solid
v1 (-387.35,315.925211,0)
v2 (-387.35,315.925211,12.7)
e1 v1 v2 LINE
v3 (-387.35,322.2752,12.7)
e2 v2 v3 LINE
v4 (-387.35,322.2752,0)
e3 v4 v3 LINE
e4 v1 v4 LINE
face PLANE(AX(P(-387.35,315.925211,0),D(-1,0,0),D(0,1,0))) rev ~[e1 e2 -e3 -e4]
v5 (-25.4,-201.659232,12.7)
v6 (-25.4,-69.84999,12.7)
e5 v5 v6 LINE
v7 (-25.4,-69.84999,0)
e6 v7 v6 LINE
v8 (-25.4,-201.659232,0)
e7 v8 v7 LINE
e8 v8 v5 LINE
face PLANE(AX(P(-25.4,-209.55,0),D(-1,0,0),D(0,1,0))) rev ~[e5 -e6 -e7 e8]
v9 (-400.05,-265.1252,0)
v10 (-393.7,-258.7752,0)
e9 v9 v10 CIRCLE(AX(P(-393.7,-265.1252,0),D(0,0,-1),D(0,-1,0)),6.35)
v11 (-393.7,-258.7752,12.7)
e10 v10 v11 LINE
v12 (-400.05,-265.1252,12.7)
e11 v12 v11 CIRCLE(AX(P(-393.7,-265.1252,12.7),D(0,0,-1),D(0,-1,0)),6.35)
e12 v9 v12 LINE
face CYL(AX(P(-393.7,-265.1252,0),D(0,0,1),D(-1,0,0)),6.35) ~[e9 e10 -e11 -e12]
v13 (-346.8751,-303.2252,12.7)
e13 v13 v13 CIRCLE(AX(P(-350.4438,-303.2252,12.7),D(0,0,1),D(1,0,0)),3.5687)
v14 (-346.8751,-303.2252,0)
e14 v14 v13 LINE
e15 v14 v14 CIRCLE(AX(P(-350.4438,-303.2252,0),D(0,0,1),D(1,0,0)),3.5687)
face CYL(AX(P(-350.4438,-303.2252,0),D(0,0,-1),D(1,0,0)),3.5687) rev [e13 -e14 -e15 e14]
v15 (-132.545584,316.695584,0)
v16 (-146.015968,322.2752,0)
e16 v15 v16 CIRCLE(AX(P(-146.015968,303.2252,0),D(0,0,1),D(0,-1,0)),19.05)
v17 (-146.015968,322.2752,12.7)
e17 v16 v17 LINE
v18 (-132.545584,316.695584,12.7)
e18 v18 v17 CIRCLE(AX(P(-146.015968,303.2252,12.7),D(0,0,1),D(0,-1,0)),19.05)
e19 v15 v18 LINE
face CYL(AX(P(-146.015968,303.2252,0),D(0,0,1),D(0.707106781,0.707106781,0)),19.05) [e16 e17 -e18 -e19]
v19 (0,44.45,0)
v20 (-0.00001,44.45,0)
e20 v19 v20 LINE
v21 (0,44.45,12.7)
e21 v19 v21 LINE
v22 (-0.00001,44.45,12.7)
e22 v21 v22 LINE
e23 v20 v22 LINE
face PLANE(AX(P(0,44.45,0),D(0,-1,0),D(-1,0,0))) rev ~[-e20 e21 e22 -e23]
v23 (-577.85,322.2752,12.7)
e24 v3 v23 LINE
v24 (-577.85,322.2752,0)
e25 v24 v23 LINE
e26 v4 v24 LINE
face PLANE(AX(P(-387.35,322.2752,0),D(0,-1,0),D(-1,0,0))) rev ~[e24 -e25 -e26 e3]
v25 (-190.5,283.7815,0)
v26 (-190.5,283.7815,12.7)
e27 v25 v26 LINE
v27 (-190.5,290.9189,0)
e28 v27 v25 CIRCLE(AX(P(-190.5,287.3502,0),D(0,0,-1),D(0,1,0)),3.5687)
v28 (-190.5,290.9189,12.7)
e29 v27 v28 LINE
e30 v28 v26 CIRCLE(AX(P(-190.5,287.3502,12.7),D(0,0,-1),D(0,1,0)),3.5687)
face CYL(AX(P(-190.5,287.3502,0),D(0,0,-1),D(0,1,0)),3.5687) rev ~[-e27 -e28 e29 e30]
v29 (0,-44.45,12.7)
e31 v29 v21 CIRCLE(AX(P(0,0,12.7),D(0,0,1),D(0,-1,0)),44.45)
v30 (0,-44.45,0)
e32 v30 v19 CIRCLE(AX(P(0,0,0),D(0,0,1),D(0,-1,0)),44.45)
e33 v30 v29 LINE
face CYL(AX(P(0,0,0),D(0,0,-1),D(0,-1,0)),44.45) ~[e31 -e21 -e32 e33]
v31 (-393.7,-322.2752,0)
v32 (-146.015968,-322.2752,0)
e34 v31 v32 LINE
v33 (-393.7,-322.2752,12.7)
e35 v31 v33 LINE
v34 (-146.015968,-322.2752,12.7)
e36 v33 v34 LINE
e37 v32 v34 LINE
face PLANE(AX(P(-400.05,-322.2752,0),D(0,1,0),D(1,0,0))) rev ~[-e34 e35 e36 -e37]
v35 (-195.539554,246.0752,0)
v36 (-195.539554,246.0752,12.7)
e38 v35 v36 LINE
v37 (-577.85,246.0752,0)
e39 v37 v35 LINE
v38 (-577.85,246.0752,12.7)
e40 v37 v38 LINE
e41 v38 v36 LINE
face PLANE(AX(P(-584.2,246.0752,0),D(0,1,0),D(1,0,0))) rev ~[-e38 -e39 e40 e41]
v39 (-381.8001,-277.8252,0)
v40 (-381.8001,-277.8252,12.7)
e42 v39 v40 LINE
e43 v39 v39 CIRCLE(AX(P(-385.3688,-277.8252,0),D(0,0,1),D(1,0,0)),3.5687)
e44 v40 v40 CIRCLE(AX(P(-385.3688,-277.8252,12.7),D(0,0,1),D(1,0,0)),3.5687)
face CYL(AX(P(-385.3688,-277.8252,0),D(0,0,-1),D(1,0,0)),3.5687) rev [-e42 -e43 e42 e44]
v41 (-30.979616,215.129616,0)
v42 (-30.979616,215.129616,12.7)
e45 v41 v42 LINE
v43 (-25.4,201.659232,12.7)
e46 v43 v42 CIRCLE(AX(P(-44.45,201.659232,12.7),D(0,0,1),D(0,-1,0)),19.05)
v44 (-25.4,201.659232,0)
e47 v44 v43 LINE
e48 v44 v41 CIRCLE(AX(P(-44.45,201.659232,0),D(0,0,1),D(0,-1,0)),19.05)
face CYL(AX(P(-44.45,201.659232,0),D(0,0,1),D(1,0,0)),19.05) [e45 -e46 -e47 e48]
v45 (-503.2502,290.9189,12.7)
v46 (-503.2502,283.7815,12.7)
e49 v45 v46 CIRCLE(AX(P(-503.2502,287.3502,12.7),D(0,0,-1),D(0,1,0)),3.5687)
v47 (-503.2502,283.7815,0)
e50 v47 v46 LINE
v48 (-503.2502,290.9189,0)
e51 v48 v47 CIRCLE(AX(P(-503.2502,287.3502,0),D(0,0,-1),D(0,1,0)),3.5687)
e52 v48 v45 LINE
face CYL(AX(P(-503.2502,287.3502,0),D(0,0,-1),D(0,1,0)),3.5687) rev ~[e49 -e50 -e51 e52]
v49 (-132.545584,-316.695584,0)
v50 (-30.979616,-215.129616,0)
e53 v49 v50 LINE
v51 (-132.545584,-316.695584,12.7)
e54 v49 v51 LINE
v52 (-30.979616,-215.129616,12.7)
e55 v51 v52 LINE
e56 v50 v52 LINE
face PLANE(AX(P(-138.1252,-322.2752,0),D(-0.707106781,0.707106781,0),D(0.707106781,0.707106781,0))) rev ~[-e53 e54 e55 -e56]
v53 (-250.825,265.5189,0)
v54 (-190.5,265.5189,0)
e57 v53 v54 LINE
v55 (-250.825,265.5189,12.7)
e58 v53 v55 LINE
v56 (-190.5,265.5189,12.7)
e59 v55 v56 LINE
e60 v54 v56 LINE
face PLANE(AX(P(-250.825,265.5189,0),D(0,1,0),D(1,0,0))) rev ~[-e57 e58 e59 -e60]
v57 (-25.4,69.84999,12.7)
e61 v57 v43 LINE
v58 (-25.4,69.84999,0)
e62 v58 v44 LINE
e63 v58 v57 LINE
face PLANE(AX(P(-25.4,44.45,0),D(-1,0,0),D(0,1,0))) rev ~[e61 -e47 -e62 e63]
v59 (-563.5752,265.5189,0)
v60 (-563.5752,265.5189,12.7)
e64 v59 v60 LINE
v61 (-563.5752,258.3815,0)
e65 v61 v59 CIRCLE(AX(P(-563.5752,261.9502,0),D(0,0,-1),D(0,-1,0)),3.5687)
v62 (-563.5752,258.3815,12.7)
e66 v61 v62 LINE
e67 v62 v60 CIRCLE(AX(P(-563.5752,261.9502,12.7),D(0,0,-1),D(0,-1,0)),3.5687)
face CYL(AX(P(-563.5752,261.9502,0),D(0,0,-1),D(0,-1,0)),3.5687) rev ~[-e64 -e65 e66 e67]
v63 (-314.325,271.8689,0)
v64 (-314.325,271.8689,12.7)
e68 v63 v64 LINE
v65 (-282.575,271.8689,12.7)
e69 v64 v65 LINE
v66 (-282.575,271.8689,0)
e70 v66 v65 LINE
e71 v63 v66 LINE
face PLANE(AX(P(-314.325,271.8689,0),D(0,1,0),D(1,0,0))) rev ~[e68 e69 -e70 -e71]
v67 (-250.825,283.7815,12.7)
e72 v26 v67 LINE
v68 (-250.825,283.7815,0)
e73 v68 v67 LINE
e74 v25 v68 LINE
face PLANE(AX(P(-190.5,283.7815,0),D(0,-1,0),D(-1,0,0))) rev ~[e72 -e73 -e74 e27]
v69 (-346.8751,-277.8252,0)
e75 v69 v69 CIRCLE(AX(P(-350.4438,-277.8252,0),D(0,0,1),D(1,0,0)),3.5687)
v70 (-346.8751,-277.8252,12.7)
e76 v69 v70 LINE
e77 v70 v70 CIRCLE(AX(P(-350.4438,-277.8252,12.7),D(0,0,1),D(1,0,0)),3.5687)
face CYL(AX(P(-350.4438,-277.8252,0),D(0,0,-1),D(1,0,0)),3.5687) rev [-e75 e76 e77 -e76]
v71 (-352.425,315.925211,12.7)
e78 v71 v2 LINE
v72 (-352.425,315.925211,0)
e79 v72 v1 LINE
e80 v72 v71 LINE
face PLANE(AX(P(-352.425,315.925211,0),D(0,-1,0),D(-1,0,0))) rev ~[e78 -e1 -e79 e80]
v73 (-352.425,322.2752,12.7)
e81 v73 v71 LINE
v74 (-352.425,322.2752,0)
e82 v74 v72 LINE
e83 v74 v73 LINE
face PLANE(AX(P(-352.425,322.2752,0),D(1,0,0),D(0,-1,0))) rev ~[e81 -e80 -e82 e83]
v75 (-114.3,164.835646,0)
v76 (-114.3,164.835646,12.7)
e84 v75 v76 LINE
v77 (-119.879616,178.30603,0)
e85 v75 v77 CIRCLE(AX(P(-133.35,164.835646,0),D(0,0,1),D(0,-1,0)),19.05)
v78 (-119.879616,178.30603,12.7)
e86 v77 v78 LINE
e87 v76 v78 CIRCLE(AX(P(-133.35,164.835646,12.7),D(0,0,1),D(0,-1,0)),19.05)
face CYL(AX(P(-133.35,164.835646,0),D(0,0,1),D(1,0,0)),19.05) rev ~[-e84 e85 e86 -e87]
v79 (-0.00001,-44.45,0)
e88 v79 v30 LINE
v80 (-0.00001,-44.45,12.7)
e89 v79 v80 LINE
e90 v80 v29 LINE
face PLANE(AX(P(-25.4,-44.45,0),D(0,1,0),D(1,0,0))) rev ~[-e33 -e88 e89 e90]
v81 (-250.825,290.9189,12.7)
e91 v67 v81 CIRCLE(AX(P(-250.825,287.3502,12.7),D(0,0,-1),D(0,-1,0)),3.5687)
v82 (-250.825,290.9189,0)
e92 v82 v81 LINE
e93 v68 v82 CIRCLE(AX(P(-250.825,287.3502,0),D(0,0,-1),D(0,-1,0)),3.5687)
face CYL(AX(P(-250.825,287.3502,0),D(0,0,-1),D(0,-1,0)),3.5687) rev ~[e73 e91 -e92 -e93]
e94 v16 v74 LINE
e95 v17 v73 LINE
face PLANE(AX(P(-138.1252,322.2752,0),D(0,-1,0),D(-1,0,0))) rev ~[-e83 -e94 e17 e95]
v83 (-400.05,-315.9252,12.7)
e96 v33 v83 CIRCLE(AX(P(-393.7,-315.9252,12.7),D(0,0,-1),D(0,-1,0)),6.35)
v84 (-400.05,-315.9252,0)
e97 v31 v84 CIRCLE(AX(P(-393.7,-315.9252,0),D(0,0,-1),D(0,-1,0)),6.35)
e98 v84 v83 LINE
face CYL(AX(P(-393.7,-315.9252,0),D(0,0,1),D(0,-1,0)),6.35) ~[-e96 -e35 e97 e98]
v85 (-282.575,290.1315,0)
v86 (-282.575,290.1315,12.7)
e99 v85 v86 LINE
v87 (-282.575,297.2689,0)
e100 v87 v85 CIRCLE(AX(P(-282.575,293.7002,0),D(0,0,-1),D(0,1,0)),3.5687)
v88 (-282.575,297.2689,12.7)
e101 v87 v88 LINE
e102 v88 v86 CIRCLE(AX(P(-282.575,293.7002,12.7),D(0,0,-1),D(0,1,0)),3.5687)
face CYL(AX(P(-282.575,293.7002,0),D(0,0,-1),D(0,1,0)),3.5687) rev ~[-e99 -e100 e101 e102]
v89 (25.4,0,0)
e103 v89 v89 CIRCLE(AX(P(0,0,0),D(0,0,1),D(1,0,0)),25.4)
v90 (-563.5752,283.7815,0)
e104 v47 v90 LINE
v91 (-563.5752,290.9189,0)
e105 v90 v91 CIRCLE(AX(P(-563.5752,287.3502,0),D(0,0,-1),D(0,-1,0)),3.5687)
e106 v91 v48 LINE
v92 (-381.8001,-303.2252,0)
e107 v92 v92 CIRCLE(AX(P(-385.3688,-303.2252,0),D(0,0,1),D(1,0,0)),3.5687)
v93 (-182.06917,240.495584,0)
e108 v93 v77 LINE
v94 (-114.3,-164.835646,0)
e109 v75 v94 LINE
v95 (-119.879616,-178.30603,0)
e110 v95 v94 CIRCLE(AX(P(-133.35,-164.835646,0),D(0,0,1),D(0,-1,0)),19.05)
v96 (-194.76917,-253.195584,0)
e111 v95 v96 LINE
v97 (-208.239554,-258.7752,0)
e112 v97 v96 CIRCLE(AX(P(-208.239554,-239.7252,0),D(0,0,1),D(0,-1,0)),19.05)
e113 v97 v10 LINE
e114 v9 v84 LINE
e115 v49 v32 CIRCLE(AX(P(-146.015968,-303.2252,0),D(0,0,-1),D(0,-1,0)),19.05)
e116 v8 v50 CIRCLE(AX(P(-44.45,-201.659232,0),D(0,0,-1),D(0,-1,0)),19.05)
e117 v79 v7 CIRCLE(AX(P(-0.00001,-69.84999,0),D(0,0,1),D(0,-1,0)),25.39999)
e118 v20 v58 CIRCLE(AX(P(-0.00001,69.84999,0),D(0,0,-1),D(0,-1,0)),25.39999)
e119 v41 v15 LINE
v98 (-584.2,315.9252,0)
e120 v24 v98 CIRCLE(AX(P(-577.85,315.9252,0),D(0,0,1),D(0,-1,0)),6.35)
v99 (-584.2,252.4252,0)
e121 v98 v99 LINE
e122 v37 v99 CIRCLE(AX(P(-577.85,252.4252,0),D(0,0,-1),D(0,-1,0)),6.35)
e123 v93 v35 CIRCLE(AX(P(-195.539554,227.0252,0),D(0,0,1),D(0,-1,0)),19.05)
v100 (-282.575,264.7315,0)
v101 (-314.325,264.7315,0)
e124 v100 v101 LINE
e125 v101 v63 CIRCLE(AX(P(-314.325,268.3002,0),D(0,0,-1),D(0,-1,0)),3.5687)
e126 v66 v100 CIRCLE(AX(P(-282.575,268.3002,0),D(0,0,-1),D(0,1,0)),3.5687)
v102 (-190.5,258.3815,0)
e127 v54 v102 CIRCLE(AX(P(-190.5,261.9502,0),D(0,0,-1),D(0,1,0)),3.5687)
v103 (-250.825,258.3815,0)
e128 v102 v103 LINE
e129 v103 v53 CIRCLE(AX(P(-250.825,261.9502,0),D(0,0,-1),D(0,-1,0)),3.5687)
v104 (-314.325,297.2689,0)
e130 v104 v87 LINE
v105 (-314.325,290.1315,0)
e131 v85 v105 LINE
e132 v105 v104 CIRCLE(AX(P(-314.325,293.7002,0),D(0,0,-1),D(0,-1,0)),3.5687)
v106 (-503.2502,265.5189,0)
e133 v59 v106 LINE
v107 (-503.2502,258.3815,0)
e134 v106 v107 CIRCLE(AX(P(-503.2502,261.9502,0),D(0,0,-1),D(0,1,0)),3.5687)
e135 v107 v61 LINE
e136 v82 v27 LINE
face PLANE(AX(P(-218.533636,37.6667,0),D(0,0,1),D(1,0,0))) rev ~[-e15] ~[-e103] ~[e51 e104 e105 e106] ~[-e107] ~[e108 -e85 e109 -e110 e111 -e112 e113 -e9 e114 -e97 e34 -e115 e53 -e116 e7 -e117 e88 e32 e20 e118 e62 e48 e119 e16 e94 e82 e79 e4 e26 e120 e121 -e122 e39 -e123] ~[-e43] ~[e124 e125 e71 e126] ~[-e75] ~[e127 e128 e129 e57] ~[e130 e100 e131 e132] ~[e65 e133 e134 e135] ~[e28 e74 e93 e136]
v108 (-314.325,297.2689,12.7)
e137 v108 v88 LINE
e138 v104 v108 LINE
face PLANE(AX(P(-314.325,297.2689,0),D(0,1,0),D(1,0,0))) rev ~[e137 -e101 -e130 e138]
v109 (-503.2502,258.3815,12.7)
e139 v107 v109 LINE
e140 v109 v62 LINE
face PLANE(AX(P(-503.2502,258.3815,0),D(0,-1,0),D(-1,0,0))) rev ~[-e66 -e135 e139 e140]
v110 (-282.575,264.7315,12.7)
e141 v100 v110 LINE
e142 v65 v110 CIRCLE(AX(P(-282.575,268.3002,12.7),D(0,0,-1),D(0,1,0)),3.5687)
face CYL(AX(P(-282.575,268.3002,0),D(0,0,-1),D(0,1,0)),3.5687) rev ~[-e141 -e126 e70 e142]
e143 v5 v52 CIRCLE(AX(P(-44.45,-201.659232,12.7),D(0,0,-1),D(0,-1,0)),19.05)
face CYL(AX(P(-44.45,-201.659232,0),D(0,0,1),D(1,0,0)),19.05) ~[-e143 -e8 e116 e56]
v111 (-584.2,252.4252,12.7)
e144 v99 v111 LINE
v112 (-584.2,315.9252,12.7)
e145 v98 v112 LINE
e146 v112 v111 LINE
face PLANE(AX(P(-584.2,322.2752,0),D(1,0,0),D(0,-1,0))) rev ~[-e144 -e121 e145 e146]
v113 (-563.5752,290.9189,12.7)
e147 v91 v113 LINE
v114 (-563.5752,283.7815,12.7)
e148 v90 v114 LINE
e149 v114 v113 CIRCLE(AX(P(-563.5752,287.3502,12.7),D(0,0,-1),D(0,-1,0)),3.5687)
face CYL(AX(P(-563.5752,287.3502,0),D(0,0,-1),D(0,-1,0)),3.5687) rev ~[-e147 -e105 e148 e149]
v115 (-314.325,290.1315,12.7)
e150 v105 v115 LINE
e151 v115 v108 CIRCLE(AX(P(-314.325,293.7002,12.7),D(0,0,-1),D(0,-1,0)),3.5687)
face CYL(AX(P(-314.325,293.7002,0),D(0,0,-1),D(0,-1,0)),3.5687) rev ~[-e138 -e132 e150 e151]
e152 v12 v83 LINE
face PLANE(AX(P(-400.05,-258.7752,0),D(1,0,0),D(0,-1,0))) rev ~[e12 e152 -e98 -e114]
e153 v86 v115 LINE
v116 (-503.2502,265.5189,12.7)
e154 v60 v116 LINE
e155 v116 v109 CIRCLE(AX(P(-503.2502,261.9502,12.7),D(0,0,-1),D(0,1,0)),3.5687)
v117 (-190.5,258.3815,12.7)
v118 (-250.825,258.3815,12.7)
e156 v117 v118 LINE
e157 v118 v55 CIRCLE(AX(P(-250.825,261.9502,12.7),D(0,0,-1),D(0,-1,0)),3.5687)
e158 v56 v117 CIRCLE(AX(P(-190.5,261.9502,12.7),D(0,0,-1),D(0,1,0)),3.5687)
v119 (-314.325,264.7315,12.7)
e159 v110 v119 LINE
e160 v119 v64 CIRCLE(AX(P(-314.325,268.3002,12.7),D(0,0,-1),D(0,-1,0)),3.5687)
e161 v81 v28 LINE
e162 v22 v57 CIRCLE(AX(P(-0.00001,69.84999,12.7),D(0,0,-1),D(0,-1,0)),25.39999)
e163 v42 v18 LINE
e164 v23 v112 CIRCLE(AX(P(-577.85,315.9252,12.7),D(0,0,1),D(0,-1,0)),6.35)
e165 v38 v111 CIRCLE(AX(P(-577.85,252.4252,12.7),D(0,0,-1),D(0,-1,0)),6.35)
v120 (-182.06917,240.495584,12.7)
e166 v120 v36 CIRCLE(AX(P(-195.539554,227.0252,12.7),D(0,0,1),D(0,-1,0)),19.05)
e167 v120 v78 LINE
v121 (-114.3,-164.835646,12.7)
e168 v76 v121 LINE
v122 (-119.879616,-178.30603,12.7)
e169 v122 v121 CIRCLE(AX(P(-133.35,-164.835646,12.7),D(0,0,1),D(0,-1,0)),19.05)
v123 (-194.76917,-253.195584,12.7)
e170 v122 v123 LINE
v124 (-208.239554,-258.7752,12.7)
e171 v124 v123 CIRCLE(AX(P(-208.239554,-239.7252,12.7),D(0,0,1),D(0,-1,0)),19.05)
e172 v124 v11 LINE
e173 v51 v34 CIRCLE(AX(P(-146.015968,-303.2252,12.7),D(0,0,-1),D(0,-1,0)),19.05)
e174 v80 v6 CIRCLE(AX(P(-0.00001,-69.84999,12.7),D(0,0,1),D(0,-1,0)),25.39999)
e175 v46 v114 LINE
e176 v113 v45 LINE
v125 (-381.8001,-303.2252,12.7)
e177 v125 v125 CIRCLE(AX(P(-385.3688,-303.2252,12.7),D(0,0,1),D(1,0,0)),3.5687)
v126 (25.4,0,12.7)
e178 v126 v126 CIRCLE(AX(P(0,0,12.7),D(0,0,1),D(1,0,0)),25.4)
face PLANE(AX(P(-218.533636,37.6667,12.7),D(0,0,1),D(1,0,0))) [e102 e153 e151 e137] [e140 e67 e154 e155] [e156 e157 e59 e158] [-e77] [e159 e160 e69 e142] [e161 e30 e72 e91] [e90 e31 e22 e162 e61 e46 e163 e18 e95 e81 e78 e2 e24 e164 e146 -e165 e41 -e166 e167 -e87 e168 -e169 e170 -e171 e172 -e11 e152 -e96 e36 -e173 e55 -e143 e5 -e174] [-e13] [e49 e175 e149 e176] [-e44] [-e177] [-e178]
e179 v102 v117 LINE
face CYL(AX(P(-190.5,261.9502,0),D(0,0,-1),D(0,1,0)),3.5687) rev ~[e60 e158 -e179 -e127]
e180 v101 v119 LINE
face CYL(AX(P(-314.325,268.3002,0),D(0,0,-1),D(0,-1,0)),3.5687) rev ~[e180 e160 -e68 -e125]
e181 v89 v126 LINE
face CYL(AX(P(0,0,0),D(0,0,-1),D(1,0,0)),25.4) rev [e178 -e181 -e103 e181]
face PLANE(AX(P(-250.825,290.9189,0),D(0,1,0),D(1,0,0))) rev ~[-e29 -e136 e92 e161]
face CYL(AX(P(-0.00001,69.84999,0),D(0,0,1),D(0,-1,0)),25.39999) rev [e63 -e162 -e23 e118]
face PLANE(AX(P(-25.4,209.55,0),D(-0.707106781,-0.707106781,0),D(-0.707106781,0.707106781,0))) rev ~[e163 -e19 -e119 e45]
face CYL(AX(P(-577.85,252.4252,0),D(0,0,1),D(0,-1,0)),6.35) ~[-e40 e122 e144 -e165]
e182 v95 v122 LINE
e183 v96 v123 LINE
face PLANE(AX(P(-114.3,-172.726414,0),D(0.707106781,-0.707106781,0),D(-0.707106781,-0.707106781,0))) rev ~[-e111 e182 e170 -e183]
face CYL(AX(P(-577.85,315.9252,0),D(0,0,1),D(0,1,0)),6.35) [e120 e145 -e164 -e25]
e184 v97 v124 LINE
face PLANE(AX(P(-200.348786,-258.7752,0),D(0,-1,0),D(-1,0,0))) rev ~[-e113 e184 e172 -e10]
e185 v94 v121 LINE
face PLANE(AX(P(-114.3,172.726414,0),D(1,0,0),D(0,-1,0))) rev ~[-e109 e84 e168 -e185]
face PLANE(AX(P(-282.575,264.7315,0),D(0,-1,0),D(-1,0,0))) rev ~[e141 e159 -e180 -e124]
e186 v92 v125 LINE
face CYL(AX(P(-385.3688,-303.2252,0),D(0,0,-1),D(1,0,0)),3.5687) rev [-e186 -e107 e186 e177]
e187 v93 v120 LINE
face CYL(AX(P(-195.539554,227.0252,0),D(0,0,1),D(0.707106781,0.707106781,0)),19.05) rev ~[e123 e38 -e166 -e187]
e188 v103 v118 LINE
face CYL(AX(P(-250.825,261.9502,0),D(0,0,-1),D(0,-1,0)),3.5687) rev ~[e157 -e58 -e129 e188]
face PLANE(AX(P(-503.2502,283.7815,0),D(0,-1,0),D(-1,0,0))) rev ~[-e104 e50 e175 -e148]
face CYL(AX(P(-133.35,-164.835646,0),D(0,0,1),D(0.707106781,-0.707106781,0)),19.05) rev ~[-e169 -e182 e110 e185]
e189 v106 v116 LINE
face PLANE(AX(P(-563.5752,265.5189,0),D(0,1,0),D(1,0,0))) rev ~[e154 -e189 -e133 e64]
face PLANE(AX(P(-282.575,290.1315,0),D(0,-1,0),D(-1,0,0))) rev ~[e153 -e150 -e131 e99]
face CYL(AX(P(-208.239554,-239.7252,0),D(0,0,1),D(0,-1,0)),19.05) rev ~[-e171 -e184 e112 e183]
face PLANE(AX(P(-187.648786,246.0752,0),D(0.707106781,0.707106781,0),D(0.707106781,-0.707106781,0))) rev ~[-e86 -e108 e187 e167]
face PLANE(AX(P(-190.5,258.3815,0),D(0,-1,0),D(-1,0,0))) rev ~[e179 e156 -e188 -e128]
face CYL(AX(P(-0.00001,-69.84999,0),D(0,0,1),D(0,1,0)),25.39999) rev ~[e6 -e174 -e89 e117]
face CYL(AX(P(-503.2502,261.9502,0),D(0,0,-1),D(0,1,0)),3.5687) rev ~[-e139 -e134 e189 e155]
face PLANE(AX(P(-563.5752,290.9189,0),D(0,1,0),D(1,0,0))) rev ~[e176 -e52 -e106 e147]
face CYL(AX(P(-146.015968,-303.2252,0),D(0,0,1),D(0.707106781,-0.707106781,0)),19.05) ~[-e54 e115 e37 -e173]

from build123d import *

# Parameters (mm, degrees)
F0_R     = 3.5687
F0_R_2   = 25.4
F1_DEPTH = 12.7
F2_R     = 25.39999
F3_R     = 19.05
F4_R     = 6.35


# Not quite as in the source:
# - a fillet or chamfer is up to 0.001 mm smaller than in the source, because OpenCascade refuses the exact size


with BuildPart() as f1:
    # F0 (on Top) → F1 (new body)
    with BuildSketch(Plane.XY):
        with BuildLine():
            Line((-25.4, -44.45), (0, -44.45))
            ThreePointArc((0, -44.45), (44.45, 0), (0, 44.45))
            Line((0, 44.45), (-25.4, 44.45))
            Line((-25.4, 44.45), (-25.4, 209.55))
            Line((-25.4, 209.55), (-138.1252, 322.2752))
            Line((-138.1252, 322.2752), (-352.425, 322.2752))
            Line((-352.425, 322.2752), (-352.425, 315.9252107143))
            Line((-352.425, 315.9252107143), (-387.35, 315.9252107143))
            Line((-387.35, 315.9252107143), (-387.35, 322.2752))
            Line((-387.35, 322.2752), (-584.2, 322.2752))
            Line((-584.2, 322.2752), (-584.2, 246.0752))
            Line((-584.2, 246.0752), (-187.648785695, 246.0752))
            Line((-187.648785695, 246.0752), (-114.3, 172.726414305))
            Line((-114.3, 172.726414305), (-114.3, -172.726414305))
            Line((-114.3, -172.726414305), (-200.348785695, -258.7752))
            Line((-200.348785695, -258.7752), (-400.05, -258.7752))
            Line((-400.05, -258.7752), (-400.05, -322.2752))
            Line((-400.05, -322.2752), (-138.1252, -322.2752))
            Line((-138.1252, -322.2752), (-25.4, -209.55))
            Line((-25.4, -209.55), (-25.4, -44.45))
        make_face()
        with Locations((-385.3688, -303.2252)):
            Circle(F0_R, mode=Mode.SUBTRACT)
        with Locations((-350.4438, -303.2252)):
            Circle(F0_R, mode=Mode.SUBTRACT)
        with Locations((-385.3688, -277.8252)):
            Circle(F0_R, mode=Mode.SUBTRACT)
        with Locations((-350.4438, -277.8252)):
            Circle(F0_R, mode=Mode.SUBTRACT)
        with BuildLine():
            Line((-503.2502, 258.3815), (-563.5752, 258.3815))
            ThreePointArc((-563.5752, 258.3815), (-567.1439, 261.9502), (-563.5752, 265.5189))
            Line((-563.5752, 265.5189), (-503.2502, 265.5189))
            ThreePointArc((-503.2502, 265.5189), (-499.6815, 261.9502), (-503.2502, 258.3815))
        make_face(mode=Mode.SUBTRACT)
        with BuildLine():
            ThreePointArc((-563.5752, 283.7815), (-567.1439, 287.3502), (-563.5752, 290.9189))
            Line((-563.5752, 290.9189), (-503.2502, 290.9189))
            ThreePointArc((-503.2502, 290.9189), (-499.6815, 287.3502), (-503.2502, 283.7815))
            Line((-503.2502, 283.7815), (-563.5752, 283.7815))
        make_face(mode=Mode.SUBTRACT)
        with BuildLine():
            Line((-282.575, 264.7315), (-314.325, 264.7315))
            ThreePointArc((-314.325, 264.7315), (-317.8937, 268.3002), (-314.325, 271.8689))
            Line((-314.325, 271.8689), (-282.575, 271.8689))
            ThreePointArc((-282.575, 271.8689), (-279.0063, 268.3002), (-282.575, 264.7315))
        make_face(mode=Mode.SUBTRACT)
        with BuildLine():
            Line((-282.575, 290.1315), (-314.325, 290.1315))
            ThreePointArc((-314.325, 290.1315), (-317.8937, 293.7002), (-314.325, 297.2689))
            Line((-314.325, 297.2689), (-282.575, 297.2689))
            ThreePointArc((-282.575, 297.2689), (-279.0063, 293.7002), (-282.575, 290.1315))
        make_face(mode=Mode.SUBTRACT)
        Circle(F0_R_2, mode=Mode.SUBTRACT)
        with BuildLine():
            Line((-190.5, 258.3815), (-250.825, 258.3815))
            ThreePointArc((-250.825, 258.3815), (-254.3937, 261.9502), (-250.825, 265.5189))
            Line((-250.825, 265.5189), (-190.5, 265.5189))
            ThreePointArc((-190.5, 265.5189), (-186.9313, 261.9502), (-190.5, 258.3815))
        make_face(mode=Mode.SUBTRACT)
        with BuildLine():
            ThreePointArc((-250.825, 283.7815), (-254.3937, 287.3502), (-250.825, 290.9189))
            Line((-250.825, 290.9189), (-190.5, 290.9189))
            ThreePointArc((-190.5, 290.9189), (-186.9313, 287.3502), (-190.5, 283.7815))
            Line((-190.5, 283.7815), (-250.825, 283.7815))
        make_face(mode=Mode.SUBTRACT)
    extrude(amount=F1_DEPTH)

    # F2 (radius 25.4 in the source; OpenCascade refuses exactly that, so slightly less here)
    f2_edges = [f1.edges().sort_by_distance(p)[0] for p in [
        (-25.4, -44.45, 6.35),
        (-25.4, 44.45, 6.35),
    ]]
    fillet(f2_edges, radius=F2_R)

    # F3
    f3_edges = [f1.edges().sort_by_distance(p)[0] for p in [
        (-25.4, -209.55, 6.35),
        (-138.1252, -322.2752, 6.35),
        (-25.4, 209.55, 6.35),
        (-138.1252, 322.2752, 6.35),
        (-114.3, 172.726414, 6.35),
        (-187.648786, 246.0752, 6.35),
        (-114.3, -172.726414, 6.35),
        (-200.348786, -258.7752, 6.35),
    ]]
    fillet(f3_edges, radius=F3_R)

    # F4
    f4_edges = [f1.edges().sort_by_distance(p)[0] for p in [
        (-400.05, -258.7752, 6.35),
        (-400.05, -322.2752, 6.35),
        (-584.2, 246.0752, 6.35),
        (-584.2, 322.2752, 6.35),
    ]]
    fillet(f4_edges, radius=F4_R)


solid = f1.part
